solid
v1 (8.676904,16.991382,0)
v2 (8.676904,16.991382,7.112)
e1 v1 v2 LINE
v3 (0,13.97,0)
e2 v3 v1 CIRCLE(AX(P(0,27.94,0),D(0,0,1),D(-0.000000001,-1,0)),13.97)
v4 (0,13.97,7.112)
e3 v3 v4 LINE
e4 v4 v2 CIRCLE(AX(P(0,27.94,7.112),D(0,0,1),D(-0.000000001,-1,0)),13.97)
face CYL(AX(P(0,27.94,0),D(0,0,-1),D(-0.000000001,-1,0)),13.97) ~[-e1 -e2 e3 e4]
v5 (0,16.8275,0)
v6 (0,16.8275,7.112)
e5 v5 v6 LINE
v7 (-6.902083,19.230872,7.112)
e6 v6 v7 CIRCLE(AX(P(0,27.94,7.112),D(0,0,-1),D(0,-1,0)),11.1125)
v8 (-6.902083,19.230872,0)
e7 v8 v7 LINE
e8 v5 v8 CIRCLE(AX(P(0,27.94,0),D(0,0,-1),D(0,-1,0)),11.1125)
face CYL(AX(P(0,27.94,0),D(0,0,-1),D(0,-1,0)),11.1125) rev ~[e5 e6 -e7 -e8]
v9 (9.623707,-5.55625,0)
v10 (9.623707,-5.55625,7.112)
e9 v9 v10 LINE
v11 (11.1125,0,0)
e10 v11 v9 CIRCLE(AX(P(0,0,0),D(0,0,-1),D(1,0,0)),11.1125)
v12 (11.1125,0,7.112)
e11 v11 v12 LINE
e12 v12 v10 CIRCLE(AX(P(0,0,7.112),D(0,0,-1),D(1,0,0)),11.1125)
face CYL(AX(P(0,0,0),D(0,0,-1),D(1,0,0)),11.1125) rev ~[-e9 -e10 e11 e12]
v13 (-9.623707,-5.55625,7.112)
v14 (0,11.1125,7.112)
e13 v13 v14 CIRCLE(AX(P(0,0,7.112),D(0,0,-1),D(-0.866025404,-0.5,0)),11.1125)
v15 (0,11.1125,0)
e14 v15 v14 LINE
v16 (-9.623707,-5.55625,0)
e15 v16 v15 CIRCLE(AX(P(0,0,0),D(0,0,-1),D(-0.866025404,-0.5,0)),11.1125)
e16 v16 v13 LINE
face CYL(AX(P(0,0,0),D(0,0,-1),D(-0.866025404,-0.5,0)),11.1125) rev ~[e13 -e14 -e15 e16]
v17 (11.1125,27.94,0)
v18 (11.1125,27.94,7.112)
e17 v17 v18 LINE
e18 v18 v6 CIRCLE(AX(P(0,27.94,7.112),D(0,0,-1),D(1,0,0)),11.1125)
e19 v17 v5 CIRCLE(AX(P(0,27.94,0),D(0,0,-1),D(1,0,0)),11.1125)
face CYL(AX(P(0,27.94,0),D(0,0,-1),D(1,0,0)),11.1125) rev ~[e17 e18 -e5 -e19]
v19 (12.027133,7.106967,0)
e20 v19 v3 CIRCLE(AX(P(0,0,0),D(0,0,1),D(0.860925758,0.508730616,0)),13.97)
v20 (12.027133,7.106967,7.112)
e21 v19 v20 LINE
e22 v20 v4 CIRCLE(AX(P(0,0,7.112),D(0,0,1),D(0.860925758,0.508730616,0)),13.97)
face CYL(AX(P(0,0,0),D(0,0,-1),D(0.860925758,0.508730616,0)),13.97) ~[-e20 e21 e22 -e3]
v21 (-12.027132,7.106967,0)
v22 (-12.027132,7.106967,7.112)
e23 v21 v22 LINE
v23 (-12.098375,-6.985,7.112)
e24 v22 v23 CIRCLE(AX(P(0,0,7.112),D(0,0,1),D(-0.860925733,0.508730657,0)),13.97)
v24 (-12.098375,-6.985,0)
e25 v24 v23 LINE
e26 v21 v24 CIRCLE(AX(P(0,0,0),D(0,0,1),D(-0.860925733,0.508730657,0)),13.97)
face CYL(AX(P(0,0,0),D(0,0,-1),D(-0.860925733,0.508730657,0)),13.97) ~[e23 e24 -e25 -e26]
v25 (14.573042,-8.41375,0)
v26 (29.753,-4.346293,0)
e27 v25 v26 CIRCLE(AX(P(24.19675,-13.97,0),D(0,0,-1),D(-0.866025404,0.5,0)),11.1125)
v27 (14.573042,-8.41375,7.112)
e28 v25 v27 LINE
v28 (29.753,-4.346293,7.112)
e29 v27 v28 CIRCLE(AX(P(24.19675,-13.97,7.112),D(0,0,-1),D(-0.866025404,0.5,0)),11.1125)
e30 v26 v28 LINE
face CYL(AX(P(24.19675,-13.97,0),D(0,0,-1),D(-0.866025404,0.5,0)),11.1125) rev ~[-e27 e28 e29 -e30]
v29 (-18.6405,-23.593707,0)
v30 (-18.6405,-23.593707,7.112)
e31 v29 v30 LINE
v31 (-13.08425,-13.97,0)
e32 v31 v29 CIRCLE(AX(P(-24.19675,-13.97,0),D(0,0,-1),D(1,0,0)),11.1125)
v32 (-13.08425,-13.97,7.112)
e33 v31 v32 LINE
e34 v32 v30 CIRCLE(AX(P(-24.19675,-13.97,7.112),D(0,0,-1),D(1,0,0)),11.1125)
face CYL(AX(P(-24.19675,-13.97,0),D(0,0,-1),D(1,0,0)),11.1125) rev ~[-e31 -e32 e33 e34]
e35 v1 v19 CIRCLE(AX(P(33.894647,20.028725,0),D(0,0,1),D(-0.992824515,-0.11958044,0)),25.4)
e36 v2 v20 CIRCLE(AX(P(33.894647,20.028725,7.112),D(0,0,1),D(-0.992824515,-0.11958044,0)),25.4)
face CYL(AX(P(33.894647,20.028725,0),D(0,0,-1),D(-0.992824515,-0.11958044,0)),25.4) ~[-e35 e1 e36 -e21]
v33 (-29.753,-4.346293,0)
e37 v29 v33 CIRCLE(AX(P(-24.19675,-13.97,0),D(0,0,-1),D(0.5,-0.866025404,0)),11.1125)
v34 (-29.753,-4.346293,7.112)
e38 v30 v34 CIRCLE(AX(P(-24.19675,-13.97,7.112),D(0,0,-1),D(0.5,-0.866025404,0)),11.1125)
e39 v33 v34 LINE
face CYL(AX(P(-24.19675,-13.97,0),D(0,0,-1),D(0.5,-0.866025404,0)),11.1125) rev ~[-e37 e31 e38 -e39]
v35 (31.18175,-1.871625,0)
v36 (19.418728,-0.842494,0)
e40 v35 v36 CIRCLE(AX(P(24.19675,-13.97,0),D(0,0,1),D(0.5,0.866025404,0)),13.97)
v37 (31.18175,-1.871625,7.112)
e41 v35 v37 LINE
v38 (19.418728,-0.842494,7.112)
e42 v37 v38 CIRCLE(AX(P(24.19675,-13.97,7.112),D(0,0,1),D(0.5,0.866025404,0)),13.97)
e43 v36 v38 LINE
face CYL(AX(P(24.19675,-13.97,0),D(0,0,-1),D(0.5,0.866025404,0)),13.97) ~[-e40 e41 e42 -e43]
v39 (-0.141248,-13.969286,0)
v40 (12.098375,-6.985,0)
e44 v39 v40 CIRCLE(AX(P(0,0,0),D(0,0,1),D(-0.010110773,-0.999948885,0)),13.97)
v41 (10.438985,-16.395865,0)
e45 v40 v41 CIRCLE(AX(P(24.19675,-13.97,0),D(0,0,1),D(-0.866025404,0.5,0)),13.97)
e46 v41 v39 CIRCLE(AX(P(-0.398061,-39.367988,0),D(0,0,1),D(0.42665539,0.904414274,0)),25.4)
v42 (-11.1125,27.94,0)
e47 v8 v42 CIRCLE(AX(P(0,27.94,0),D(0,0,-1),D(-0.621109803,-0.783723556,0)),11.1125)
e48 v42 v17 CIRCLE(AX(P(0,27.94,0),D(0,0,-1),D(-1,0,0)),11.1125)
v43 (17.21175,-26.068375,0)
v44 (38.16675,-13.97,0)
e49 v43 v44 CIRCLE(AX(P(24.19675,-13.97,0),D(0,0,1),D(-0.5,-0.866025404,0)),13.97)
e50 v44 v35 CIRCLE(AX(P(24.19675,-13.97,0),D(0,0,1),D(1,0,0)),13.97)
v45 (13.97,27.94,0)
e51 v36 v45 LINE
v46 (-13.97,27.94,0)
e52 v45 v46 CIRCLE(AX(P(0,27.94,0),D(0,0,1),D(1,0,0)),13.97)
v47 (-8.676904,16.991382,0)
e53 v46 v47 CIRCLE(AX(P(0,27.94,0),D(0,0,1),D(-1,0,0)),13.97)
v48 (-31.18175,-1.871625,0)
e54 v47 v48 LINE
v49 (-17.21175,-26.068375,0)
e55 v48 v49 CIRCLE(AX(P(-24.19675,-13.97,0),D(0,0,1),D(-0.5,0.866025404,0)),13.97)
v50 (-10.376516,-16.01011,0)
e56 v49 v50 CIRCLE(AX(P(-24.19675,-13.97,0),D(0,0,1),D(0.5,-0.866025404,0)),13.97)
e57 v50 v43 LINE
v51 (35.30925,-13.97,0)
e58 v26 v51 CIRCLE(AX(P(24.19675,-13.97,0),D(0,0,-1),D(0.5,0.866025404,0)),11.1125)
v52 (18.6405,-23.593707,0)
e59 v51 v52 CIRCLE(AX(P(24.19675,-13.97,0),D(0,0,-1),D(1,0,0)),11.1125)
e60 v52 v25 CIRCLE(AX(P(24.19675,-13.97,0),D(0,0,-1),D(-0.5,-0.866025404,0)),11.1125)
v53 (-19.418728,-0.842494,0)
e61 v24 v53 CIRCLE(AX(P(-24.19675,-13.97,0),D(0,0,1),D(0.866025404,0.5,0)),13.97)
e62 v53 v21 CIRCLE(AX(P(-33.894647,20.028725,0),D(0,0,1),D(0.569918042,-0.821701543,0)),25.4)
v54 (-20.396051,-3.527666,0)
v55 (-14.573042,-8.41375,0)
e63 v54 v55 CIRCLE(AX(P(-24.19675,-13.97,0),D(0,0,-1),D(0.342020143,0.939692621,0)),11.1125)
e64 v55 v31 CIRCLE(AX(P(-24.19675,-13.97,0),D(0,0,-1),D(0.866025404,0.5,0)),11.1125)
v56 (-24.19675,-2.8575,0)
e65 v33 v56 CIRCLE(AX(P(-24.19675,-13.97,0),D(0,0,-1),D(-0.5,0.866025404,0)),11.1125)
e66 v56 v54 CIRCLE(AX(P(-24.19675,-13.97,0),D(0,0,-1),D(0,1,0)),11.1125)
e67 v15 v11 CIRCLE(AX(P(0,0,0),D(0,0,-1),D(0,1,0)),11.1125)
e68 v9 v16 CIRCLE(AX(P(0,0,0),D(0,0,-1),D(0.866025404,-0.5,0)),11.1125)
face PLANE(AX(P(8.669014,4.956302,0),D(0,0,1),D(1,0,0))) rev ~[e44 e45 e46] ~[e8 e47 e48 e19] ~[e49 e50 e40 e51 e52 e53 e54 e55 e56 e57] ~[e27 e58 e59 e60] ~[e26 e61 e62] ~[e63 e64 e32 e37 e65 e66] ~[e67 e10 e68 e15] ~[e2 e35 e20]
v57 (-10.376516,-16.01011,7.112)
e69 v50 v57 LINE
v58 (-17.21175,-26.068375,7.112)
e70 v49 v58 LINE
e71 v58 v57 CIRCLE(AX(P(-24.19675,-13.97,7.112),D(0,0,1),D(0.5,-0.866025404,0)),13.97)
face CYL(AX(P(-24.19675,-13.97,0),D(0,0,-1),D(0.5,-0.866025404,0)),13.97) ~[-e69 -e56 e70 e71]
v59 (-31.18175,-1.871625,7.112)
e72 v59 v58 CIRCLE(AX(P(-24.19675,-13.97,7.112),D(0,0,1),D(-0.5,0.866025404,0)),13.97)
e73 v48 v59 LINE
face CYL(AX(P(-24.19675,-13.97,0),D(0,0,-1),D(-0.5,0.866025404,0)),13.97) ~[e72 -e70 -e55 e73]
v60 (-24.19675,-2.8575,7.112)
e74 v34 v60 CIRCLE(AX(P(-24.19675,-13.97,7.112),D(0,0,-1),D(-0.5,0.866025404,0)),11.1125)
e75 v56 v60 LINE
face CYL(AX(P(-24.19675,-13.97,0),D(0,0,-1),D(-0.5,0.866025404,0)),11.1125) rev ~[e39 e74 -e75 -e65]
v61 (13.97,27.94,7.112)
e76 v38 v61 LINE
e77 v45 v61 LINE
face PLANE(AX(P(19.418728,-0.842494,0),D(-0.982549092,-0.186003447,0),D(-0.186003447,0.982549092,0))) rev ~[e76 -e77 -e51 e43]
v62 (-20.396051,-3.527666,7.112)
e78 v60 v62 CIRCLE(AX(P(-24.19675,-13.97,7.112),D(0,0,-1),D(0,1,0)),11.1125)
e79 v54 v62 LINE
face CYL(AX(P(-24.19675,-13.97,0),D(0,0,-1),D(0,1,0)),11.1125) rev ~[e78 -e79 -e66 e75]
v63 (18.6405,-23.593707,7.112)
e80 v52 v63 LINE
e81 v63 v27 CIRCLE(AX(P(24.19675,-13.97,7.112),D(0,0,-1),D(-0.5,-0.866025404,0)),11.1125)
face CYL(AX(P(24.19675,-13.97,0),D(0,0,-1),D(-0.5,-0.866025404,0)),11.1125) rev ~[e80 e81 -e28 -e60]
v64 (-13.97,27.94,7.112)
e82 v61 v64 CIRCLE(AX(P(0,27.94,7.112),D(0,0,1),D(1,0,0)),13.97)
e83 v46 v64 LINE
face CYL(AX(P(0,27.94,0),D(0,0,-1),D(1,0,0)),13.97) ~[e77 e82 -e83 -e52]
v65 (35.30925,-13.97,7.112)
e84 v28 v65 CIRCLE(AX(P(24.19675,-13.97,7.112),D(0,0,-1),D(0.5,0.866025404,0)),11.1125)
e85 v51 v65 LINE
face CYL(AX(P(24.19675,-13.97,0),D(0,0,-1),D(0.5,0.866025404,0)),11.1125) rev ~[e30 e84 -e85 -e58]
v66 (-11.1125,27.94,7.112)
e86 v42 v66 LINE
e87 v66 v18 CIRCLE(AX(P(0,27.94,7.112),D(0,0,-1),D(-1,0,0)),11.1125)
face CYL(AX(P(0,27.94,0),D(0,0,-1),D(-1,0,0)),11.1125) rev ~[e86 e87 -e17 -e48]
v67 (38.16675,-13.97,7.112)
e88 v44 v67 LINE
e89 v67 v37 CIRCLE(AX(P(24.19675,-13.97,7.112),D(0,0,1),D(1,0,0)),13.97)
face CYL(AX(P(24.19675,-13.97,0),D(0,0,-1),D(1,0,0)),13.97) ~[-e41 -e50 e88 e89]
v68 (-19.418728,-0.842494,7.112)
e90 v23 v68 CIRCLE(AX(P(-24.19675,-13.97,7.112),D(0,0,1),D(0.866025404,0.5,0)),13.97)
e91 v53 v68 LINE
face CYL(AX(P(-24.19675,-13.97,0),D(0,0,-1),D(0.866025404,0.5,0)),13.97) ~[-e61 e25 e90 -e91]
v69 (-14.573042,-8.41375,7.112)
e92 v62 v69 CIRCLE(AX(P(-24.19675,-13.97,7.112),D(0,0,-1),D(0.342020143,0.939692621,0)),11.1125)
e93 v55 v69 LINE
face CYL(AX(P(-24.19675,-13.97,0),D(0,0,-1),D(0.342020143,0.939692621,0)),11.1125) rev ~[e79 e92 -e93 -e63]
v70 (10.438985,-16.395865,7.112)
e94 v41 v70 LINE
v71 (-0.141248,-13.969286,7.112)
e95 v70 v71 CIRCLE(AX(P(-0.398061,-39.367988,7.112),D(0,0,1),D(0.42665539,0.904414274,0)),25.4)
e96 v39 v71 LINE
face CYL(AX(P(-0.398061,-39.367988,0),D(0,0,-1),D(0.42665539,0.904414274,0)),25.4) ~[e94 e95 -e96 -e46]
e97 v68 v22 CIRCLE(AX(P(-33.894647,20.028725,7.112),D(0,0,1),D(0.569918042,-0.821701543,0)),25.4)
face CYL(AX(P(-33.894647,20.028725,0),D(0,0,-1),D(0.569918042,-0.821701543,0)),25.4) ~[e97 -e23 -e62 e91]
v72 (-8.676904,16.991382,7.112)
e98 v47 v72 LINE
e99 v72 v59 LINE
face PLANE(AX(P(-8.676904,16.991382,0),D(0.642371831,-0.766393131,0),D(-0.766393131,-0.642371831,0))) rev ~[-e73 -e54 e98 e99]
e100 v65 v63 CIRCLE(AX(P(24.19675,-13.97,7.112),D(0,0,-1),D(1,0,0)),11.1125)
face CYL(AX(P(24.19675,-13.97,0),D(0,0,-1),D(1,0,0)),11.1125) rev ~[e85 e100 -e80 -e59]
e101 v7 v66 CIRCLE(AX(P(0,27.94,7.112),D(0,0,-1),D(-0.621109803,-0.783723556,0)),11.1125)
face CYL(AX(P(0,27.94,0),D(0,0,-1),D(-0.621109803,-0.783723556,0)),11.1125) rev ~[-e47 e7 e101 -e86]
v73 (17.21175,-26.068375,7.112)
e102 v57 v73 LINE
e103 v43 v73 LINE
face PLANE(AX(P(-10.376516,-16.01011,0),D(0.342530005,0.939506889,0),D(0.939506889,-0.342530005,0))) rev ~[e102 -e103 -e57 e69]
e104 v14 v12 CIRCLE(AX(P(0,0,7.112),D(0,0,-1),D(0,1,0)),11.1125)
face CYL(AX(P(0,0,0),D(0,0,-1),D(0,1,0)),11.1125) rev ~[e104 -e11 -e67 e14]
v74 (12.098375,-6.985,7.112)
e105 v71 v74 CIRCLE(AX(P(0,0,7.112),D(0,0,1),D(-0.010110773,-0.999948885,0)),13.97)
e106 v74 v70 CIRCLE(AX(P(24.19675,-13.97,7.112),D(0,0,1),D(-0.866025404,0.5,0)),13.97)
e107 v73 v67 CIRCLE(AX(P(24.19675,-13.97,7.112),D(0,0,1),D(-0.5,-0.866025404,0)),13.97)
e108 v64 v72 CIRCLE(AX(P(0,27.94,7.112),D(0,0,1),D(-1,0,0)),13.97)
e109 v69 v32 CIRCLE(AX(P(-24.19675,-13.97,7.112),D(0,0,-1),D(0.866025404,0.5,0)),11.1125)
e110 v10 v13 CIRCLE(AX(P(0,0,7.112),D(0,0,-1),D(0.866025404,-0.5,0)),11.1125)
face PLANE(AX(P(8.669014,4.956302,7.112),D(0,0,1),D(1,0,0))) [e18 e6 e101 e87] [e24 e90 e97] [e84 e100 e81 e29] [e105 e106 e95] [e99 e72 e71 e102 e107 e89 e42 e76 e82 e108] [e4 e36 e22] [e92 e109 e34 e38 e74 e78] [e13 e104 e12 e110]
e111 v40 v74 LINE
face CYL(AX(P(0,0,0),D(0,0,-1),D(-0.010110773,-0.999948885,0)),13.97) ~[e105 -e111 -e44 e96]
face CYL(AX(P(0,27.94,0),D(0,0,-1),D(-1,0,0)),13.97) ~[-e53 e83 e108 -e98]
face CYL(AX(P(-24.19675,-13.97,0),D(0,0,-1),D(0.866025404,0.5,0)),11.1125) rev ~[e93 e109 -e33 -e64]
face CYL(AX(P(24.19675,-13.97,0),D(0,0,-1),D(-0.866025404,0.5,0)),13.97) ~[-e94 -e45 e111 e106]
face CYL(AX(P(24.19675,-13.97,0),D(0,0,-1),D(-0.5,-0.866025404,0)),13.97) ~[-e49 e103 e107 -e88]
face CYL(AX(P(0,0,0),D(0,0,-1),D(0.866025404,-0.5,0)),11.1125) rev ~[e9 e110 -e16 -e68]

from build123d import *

# Parameters (mm, degrees)
F1_DEPTH = 7.112


# Not quite as in the source:
# - ends of sketch curves that miss each other by under 0.0002 mm in the source are joined
# - a feature names something its author has since deleted; it is built from what else it names


with BuildPart() as f1:
    # F0 (on Top) → F1 (new body)
    with BuildSketch(Plane.XY):
        with BuildLine():
            ThreePointArc((0, 11.1125), (7.8577241059, 7.8577241059), (11.1125, 0))
            ThreePointArc((11.1125, 0), (10.7338507446, -2.8761266387), (9.6237072996, -5.55625))
            Line((9.6237072996, -5.55625), (12.0983748909, -6.985))
            ThreePointArc((12.0983748909, -6.985), (13.4939838315, -3.6157019175), (13.97, 0))
            ThreePointArc((13.97, 0), (13.4755323786, 3.6838739276), (12.0271328398, 7.1069666985))
            ThreePointArc((12.0271328398, 7.1069666985), (6.9237480813, 12.133532565), (-1.95e-08, 13.97))
            Line((-1.95e-08, 13.97), (0, 11.1125))
        make_face()
        with BuildLine():
            ThreePointArc((-9.6237072996, -5.55625), (-9.6237072996, 5.55625), (0, 11.1125))
            Line((0, 11.1125), (0, 13.97))
            ThreePointArc((-1.95e-08, 13.97), (-6.9237478038, 12.1335327234), (-12.0271324949, 7.1069672823))
            ThreePointArc((-12.0271324949, 7.1069672823), (-13.9698214779, 0.0706248839), (-12.0983748909, -6.985))
            Line((-12.0983748909, -6.985), (-9.6237072996, -5.55625))
        make_face()
        with BuildLine():
            Line((12.0983748909, -6.985), (9.6237072996, -5.55625))
            ThreePointArc((9.6237072996, -5.55625), (0, -11.1125), (-9.6237072996, -5.55625))
            Line((-9.6237072996, -5.55625), (-12.0983748909, -6.985))
            ThreePointArc((-12.0983748909, -6.985), (-7.0460734842, -12.0629079602), (-0.1412475033, -13.969285921))
            ThreePointArc((-0.1412475033, -13.969285921), (6.9237481232, -12.1335325411), (12.0983748909, -6.985))
        make_face()
        with BuildLine():
            ThreePointArc((-8.6769039474, 16.9913819188), (-4.593947408, 14.7469507993), (-1.95e-08, 13.97))
            Line((0, 13.97), (0, 16.8275))
            ThreePointArc((0, 16.8275), (-3.65427634, 17.4455290423), (-6.9020826854, 19.2308719809))
            Line((-6.9020826854, 19.2308719809), (-8.6769039474, 16.9913819188))
        make_face()
        with BuildLine():
            ThreePointArc((-12.0271324949, 7.1069672823), (-6.9237478038, 12.1335327234), (-1.95e-08, 13.97))
            ThreePointArc((-1.95e-08, 13.97), (-4.593947408, 14.7469507993), (-8.6769039474, 16.9913819188))
            ThreePointArc((-8.6769039474, 16.9913819188), (-9.8388621787, 11.8752452293), (-12.0271324949, 7.1069672823))
        make_face()
        with BuildLine():
            Line((0, 16.8275), (0, 13.97))
            ThreePointArc((-1.95e-08, 13.97), (4.5939473896, 14.7469507929), (8.6769039474, 16.9913819188))
            ThreePointArc((8.6769039474, 16.9913819188), (12.5773059147, 21.8595168015), (13.97, 27.94))
            Line((13.97, 27.94), (11.1125, 27.94))
            ThreePointArc((11.1125, 27.94), (7.8577241059, 20.0822758941), (0, 16.8275))
        make_face()
        with BuildLine():
            ThreePointArc((19.4187283795, -0.8424940876), (15.2170069875, -3.2683590347), (12.0983750385, -6.9849997443))
            Line((12.0983750385, -6.9849997443), (14.5730424822, -8.41375))
            ThreePointArc((14.5730424822, -8.41375), (21.320623143, -3.2361492554), (29.7529997817, -4.3462927004))
            Line((29.7529997817, -4.3462927004), (31.1817497817, -1.8716251091))
            ThreePointArc((31.1817497817, -1.8716251091), (25.4143155079, -0.0531600677), (19.4187283795, -0.8424940876))
        make_face()
        with BuildLine():
            ThreePointArc((13.97, 0), (13.4939838315, -3.6157019175), (12.0983750385, -6.9849997443))
            ThreePointArc((12.0983750385, -6.9849997443), (15.2170069875, -3.2683590347), (19.4187283795, -0.8424940876))
            ThreePointArc((19.4187283795, -0.8424940876), (15.2933094518, 2.7327644521), (12.0271328398, 7.1069666985))
            ThreePointArc((12.0271328398, 7.1069666985), (13.4755323786, 3.6838739276), (13.97, 0))
        make_face()
        with BuildLine():
            Line((14.5730424822, -8.41375), (12.0983748909, -6.985))
            ThreePointArc((12.0983748909, -6.985), (10.4389854978, -11.5441348126), (10.4389854722, -16.395865042))
            ThreePointArc((10.4389854722, -16.395865042), (12.753195723, -21.9828628158), (17.2117497817, -26.0683748909))
            Line((17.2117497817, -26.0683748909), (18.6404997817, -23.5937072996))
            ThreePointArc((18.6404997817, -23.5937072996), (13.4628990371, -16.8461266387), (14.5730424822, -8.41375))
        make_face()
        with BuildLine():
            ThreePointArc((-10.2267497817, -13.97), (-10.7027659885, -10.3542979399), (-12.0983748909, -6.985))
            Line((-12.0983748909, -6.985), (-14.5730424822, -8.41375))
            ThreePointArc((-14.5730424822, -8.41375), (-13.4628990371, -11.0938733613), (-13.0842497817, -13.97))
            ThreePointArc((-13.0842497817, -13.97), (-14.5730424822, -19.52625), (-18.6404997817, -23.5937072996))
            Line((-18.6404997817, -23.5937072996), (-17.2117497817, -26.0683748909))
            ThreePointArc((-17.2117497817, -26.0683748909), (-12.6422439072, -21.8220248341), (-10.3765164134, -16.010110204))
            ThreePointArc((-10.3765164134, -16.010110204), (-10.2642417492, -14.9928000402), (-10.2267497817, -13.97))
        make_face()
        with BuildLine():
            ThreePointArc((-0.1412475033, -13.969285921), (-7.0460734842, -12.0629079602), (-12.0983748909, -6.985))
            ThreePointArc((-12.0983748909, -6.985), (-10.7027659885, -10.3542979399), (-10.2267497817, -13.97))
            ThreePointArc((-10.2267497817, -13.97), (-10.2642417492, -14.9928000402), (-10.3765164134, -16.010110204))
            ThreePointArc((-10.3765164134, -16.010110204), (-5.36483273, -14.4583271608), (-0.1412475033, -13.969285921))
        make_face()
        with BuildLine():
            Line((-14.5730424822, -8.41375), (-12.0983748909, -6.985))
            ThreePointArc((-12.0983748909, -6.985), (-15.2170068744, -3.2683591296), (-19.4187283795, -0.8424940876))
            Line((-19.4187283795, -0.8424940876), (-20.396050939, -3.5276657515))
            ThreePointArc((-20.396050939, -3.5276657515), (-17.0537724691, -5.4573311258), (-14.5730424822, -8.41375))
        make_face()
        with BuildLine():
            ThreePointArc((8.6769039474, 16.9913819188), (9.8388622875, 11.8752449082), (12.0271328398, 7.1069666985))
            ThreePointArc((12.0271328398, 7.1069666985), (15.2933094518, 2.7327644521), (19.4187283795, -0.8424940876))
            Line((19.4187283795, -0.8424940876), (13.97, 27.94))
            ThreePointArc((13.97, 27.94), (12.5773059147, 21.8595168015), (8.6769039474, 16.9913819188))
        make_face()
        with BuildLine():
            ThreePointArc((-19.4187283795, -0.8424940876), (-15.293309221, 2.7327647003), (-12.0271324949, 7.1069672823))
            ThreePointArc((-12.0271324949, 7.1069672823), (-9.8388621787, 11.8752452293), (-8.6769039474, 16.9913819188))
            Line((-8.6769039474, 16.9913819188), (-31.1817497817, -1.8716251091))
            ThreePointArc((-31.1817497817, -1.8716251091), (-27.8124518418, -0.4760162067), (-24.1967497817, 0))
            ThreePointArc((-24.1967497817, 0), (-21.7708847397, -0.2122356904), (-19.4187283795, -0.8424940876))
        make_face()
        with BuildLine():
            ThreePointArc((-13.97, 27.94), (-12.5773059147, 21.8595168015), (-8.6769039474, 16.9913819188))
            Line((-8.6769039474, 16.9913819188), (-6.9020826854, 19.2308719809))
            ThreePointArc((-6.9020826854, 19.2308719809), (-10.0046751594, 23.1032520012), (-11.1125, 27.94))
            Line((-11.1125, 27.94), (-13.97, 27.94))
        make_face()
        with BuildLine():
            ThreePointArc((10.4389854722, -16.395865042), (5.2800111814, -14.6107766948), (-0.1412475033, -13.969285921))
            ThreePointArc((-0.1412475033, -13.969285921), (-5.36483273, -14.4583271608), (-10.3765164134, -16.010110204))
            Line((-10.3765164134, -16.010110204), (17.2117497817, -26.0683748909))
            ThreePointArc((17.2117497817, -26.0683748909), (12.753195723, -21.9828628158), (10.4389854722, -16.395865042))
        make_face()
        with BuildLine():
            Line((-20.396050939, -3.5276657515), (-19.4187283795, -0.8424940876))
            ThreePointArc((-19.4187283795, -0.8424940876), (-21.7708847397, -0.2122356904), (-24.1967497817, 0))
            Line((-24.1967497817, 0), (-24.1967497817, -2.8575))
            ThreePointArc((-24.1967497817, -2.8575), (-22.2670844074, -3.0263238447), (-20.396050939, -3.5276657515))
        make_face()
        with BuildLine():
            ThreePointArc((-11.1125, 27.94), (0, 39.0525), (11.1125, 27.94))
            Line((11.1125, 27.94), (13.97, 27.94))
            ThreePointArc((13.97, 27.94), (0, 41.91), (-13.97, 27.94))
            Line((-13.97, 27.94), (-11.1125, 27.94))
        make_face()
        with BuildLine():
            Line((-29.7529997817, -4.3462927004), (-31.1817497817, -1.8716251091))
            ThreePointArc((-31.1817497817, -1.8716251091), (-36.2951246726, -20.955), (-17.2117497817, -26.0683748909))
            Line((-17.2117497817, -26.0683748909), (-18.6404997817, -23.5937072996))
            ThreePointArc((-18.6404997817, -23.5937072996), (-33.8204570813, -19.52625), (-29.7529997817, -4.3462927004))
        make_face()
        with BuildLine():
            ThreePointArc((-24.1967497817, 0), (-27.8124518418, -0.4760162067), (-31.1817497817, -1.8716251091))
            Line((-31.1817497817, -1.8716251091), (-29.7529997817, -4.3462927004))
            ThreePointArc((-29.7529997817, -4.3462927004), (-27.0728764204, -3.2361492554), (-24.1967497817, -2.8575))
            Line((-24.1967497817, -2.8575), (-24.1967497817, 0))
        make_face()
        with BuildLine():
            Line((31.1817497817, -1.8716251091), (29.7529997817, -4.3462927004))
            ThreePointArc((29.7529997817, -4.3462927004), (33.8204570813, -8.41375), (35.3092497817, -13.97))
            ThreePointArc((35.3092497817, -13.97), (29.7529997817, -23.5937072996), (18.6404997817, -23.5937072996))
            Line((18.6404997817, -23.5937072996), (17.2117497817, -26.0683748909))
            ThreePointArc((17.2117497817, -26.0683748909), (31.1817497817, -26.0683748909), (38.1667497817, -13.97))
            ThreePointArc((38.1667497817, -13.97), (36.2951246726, -6.985), (31.1817497817, -1.8716251091))
        make_face()
    extrude(amount=F1_DEPTH)


solid = f1.part
